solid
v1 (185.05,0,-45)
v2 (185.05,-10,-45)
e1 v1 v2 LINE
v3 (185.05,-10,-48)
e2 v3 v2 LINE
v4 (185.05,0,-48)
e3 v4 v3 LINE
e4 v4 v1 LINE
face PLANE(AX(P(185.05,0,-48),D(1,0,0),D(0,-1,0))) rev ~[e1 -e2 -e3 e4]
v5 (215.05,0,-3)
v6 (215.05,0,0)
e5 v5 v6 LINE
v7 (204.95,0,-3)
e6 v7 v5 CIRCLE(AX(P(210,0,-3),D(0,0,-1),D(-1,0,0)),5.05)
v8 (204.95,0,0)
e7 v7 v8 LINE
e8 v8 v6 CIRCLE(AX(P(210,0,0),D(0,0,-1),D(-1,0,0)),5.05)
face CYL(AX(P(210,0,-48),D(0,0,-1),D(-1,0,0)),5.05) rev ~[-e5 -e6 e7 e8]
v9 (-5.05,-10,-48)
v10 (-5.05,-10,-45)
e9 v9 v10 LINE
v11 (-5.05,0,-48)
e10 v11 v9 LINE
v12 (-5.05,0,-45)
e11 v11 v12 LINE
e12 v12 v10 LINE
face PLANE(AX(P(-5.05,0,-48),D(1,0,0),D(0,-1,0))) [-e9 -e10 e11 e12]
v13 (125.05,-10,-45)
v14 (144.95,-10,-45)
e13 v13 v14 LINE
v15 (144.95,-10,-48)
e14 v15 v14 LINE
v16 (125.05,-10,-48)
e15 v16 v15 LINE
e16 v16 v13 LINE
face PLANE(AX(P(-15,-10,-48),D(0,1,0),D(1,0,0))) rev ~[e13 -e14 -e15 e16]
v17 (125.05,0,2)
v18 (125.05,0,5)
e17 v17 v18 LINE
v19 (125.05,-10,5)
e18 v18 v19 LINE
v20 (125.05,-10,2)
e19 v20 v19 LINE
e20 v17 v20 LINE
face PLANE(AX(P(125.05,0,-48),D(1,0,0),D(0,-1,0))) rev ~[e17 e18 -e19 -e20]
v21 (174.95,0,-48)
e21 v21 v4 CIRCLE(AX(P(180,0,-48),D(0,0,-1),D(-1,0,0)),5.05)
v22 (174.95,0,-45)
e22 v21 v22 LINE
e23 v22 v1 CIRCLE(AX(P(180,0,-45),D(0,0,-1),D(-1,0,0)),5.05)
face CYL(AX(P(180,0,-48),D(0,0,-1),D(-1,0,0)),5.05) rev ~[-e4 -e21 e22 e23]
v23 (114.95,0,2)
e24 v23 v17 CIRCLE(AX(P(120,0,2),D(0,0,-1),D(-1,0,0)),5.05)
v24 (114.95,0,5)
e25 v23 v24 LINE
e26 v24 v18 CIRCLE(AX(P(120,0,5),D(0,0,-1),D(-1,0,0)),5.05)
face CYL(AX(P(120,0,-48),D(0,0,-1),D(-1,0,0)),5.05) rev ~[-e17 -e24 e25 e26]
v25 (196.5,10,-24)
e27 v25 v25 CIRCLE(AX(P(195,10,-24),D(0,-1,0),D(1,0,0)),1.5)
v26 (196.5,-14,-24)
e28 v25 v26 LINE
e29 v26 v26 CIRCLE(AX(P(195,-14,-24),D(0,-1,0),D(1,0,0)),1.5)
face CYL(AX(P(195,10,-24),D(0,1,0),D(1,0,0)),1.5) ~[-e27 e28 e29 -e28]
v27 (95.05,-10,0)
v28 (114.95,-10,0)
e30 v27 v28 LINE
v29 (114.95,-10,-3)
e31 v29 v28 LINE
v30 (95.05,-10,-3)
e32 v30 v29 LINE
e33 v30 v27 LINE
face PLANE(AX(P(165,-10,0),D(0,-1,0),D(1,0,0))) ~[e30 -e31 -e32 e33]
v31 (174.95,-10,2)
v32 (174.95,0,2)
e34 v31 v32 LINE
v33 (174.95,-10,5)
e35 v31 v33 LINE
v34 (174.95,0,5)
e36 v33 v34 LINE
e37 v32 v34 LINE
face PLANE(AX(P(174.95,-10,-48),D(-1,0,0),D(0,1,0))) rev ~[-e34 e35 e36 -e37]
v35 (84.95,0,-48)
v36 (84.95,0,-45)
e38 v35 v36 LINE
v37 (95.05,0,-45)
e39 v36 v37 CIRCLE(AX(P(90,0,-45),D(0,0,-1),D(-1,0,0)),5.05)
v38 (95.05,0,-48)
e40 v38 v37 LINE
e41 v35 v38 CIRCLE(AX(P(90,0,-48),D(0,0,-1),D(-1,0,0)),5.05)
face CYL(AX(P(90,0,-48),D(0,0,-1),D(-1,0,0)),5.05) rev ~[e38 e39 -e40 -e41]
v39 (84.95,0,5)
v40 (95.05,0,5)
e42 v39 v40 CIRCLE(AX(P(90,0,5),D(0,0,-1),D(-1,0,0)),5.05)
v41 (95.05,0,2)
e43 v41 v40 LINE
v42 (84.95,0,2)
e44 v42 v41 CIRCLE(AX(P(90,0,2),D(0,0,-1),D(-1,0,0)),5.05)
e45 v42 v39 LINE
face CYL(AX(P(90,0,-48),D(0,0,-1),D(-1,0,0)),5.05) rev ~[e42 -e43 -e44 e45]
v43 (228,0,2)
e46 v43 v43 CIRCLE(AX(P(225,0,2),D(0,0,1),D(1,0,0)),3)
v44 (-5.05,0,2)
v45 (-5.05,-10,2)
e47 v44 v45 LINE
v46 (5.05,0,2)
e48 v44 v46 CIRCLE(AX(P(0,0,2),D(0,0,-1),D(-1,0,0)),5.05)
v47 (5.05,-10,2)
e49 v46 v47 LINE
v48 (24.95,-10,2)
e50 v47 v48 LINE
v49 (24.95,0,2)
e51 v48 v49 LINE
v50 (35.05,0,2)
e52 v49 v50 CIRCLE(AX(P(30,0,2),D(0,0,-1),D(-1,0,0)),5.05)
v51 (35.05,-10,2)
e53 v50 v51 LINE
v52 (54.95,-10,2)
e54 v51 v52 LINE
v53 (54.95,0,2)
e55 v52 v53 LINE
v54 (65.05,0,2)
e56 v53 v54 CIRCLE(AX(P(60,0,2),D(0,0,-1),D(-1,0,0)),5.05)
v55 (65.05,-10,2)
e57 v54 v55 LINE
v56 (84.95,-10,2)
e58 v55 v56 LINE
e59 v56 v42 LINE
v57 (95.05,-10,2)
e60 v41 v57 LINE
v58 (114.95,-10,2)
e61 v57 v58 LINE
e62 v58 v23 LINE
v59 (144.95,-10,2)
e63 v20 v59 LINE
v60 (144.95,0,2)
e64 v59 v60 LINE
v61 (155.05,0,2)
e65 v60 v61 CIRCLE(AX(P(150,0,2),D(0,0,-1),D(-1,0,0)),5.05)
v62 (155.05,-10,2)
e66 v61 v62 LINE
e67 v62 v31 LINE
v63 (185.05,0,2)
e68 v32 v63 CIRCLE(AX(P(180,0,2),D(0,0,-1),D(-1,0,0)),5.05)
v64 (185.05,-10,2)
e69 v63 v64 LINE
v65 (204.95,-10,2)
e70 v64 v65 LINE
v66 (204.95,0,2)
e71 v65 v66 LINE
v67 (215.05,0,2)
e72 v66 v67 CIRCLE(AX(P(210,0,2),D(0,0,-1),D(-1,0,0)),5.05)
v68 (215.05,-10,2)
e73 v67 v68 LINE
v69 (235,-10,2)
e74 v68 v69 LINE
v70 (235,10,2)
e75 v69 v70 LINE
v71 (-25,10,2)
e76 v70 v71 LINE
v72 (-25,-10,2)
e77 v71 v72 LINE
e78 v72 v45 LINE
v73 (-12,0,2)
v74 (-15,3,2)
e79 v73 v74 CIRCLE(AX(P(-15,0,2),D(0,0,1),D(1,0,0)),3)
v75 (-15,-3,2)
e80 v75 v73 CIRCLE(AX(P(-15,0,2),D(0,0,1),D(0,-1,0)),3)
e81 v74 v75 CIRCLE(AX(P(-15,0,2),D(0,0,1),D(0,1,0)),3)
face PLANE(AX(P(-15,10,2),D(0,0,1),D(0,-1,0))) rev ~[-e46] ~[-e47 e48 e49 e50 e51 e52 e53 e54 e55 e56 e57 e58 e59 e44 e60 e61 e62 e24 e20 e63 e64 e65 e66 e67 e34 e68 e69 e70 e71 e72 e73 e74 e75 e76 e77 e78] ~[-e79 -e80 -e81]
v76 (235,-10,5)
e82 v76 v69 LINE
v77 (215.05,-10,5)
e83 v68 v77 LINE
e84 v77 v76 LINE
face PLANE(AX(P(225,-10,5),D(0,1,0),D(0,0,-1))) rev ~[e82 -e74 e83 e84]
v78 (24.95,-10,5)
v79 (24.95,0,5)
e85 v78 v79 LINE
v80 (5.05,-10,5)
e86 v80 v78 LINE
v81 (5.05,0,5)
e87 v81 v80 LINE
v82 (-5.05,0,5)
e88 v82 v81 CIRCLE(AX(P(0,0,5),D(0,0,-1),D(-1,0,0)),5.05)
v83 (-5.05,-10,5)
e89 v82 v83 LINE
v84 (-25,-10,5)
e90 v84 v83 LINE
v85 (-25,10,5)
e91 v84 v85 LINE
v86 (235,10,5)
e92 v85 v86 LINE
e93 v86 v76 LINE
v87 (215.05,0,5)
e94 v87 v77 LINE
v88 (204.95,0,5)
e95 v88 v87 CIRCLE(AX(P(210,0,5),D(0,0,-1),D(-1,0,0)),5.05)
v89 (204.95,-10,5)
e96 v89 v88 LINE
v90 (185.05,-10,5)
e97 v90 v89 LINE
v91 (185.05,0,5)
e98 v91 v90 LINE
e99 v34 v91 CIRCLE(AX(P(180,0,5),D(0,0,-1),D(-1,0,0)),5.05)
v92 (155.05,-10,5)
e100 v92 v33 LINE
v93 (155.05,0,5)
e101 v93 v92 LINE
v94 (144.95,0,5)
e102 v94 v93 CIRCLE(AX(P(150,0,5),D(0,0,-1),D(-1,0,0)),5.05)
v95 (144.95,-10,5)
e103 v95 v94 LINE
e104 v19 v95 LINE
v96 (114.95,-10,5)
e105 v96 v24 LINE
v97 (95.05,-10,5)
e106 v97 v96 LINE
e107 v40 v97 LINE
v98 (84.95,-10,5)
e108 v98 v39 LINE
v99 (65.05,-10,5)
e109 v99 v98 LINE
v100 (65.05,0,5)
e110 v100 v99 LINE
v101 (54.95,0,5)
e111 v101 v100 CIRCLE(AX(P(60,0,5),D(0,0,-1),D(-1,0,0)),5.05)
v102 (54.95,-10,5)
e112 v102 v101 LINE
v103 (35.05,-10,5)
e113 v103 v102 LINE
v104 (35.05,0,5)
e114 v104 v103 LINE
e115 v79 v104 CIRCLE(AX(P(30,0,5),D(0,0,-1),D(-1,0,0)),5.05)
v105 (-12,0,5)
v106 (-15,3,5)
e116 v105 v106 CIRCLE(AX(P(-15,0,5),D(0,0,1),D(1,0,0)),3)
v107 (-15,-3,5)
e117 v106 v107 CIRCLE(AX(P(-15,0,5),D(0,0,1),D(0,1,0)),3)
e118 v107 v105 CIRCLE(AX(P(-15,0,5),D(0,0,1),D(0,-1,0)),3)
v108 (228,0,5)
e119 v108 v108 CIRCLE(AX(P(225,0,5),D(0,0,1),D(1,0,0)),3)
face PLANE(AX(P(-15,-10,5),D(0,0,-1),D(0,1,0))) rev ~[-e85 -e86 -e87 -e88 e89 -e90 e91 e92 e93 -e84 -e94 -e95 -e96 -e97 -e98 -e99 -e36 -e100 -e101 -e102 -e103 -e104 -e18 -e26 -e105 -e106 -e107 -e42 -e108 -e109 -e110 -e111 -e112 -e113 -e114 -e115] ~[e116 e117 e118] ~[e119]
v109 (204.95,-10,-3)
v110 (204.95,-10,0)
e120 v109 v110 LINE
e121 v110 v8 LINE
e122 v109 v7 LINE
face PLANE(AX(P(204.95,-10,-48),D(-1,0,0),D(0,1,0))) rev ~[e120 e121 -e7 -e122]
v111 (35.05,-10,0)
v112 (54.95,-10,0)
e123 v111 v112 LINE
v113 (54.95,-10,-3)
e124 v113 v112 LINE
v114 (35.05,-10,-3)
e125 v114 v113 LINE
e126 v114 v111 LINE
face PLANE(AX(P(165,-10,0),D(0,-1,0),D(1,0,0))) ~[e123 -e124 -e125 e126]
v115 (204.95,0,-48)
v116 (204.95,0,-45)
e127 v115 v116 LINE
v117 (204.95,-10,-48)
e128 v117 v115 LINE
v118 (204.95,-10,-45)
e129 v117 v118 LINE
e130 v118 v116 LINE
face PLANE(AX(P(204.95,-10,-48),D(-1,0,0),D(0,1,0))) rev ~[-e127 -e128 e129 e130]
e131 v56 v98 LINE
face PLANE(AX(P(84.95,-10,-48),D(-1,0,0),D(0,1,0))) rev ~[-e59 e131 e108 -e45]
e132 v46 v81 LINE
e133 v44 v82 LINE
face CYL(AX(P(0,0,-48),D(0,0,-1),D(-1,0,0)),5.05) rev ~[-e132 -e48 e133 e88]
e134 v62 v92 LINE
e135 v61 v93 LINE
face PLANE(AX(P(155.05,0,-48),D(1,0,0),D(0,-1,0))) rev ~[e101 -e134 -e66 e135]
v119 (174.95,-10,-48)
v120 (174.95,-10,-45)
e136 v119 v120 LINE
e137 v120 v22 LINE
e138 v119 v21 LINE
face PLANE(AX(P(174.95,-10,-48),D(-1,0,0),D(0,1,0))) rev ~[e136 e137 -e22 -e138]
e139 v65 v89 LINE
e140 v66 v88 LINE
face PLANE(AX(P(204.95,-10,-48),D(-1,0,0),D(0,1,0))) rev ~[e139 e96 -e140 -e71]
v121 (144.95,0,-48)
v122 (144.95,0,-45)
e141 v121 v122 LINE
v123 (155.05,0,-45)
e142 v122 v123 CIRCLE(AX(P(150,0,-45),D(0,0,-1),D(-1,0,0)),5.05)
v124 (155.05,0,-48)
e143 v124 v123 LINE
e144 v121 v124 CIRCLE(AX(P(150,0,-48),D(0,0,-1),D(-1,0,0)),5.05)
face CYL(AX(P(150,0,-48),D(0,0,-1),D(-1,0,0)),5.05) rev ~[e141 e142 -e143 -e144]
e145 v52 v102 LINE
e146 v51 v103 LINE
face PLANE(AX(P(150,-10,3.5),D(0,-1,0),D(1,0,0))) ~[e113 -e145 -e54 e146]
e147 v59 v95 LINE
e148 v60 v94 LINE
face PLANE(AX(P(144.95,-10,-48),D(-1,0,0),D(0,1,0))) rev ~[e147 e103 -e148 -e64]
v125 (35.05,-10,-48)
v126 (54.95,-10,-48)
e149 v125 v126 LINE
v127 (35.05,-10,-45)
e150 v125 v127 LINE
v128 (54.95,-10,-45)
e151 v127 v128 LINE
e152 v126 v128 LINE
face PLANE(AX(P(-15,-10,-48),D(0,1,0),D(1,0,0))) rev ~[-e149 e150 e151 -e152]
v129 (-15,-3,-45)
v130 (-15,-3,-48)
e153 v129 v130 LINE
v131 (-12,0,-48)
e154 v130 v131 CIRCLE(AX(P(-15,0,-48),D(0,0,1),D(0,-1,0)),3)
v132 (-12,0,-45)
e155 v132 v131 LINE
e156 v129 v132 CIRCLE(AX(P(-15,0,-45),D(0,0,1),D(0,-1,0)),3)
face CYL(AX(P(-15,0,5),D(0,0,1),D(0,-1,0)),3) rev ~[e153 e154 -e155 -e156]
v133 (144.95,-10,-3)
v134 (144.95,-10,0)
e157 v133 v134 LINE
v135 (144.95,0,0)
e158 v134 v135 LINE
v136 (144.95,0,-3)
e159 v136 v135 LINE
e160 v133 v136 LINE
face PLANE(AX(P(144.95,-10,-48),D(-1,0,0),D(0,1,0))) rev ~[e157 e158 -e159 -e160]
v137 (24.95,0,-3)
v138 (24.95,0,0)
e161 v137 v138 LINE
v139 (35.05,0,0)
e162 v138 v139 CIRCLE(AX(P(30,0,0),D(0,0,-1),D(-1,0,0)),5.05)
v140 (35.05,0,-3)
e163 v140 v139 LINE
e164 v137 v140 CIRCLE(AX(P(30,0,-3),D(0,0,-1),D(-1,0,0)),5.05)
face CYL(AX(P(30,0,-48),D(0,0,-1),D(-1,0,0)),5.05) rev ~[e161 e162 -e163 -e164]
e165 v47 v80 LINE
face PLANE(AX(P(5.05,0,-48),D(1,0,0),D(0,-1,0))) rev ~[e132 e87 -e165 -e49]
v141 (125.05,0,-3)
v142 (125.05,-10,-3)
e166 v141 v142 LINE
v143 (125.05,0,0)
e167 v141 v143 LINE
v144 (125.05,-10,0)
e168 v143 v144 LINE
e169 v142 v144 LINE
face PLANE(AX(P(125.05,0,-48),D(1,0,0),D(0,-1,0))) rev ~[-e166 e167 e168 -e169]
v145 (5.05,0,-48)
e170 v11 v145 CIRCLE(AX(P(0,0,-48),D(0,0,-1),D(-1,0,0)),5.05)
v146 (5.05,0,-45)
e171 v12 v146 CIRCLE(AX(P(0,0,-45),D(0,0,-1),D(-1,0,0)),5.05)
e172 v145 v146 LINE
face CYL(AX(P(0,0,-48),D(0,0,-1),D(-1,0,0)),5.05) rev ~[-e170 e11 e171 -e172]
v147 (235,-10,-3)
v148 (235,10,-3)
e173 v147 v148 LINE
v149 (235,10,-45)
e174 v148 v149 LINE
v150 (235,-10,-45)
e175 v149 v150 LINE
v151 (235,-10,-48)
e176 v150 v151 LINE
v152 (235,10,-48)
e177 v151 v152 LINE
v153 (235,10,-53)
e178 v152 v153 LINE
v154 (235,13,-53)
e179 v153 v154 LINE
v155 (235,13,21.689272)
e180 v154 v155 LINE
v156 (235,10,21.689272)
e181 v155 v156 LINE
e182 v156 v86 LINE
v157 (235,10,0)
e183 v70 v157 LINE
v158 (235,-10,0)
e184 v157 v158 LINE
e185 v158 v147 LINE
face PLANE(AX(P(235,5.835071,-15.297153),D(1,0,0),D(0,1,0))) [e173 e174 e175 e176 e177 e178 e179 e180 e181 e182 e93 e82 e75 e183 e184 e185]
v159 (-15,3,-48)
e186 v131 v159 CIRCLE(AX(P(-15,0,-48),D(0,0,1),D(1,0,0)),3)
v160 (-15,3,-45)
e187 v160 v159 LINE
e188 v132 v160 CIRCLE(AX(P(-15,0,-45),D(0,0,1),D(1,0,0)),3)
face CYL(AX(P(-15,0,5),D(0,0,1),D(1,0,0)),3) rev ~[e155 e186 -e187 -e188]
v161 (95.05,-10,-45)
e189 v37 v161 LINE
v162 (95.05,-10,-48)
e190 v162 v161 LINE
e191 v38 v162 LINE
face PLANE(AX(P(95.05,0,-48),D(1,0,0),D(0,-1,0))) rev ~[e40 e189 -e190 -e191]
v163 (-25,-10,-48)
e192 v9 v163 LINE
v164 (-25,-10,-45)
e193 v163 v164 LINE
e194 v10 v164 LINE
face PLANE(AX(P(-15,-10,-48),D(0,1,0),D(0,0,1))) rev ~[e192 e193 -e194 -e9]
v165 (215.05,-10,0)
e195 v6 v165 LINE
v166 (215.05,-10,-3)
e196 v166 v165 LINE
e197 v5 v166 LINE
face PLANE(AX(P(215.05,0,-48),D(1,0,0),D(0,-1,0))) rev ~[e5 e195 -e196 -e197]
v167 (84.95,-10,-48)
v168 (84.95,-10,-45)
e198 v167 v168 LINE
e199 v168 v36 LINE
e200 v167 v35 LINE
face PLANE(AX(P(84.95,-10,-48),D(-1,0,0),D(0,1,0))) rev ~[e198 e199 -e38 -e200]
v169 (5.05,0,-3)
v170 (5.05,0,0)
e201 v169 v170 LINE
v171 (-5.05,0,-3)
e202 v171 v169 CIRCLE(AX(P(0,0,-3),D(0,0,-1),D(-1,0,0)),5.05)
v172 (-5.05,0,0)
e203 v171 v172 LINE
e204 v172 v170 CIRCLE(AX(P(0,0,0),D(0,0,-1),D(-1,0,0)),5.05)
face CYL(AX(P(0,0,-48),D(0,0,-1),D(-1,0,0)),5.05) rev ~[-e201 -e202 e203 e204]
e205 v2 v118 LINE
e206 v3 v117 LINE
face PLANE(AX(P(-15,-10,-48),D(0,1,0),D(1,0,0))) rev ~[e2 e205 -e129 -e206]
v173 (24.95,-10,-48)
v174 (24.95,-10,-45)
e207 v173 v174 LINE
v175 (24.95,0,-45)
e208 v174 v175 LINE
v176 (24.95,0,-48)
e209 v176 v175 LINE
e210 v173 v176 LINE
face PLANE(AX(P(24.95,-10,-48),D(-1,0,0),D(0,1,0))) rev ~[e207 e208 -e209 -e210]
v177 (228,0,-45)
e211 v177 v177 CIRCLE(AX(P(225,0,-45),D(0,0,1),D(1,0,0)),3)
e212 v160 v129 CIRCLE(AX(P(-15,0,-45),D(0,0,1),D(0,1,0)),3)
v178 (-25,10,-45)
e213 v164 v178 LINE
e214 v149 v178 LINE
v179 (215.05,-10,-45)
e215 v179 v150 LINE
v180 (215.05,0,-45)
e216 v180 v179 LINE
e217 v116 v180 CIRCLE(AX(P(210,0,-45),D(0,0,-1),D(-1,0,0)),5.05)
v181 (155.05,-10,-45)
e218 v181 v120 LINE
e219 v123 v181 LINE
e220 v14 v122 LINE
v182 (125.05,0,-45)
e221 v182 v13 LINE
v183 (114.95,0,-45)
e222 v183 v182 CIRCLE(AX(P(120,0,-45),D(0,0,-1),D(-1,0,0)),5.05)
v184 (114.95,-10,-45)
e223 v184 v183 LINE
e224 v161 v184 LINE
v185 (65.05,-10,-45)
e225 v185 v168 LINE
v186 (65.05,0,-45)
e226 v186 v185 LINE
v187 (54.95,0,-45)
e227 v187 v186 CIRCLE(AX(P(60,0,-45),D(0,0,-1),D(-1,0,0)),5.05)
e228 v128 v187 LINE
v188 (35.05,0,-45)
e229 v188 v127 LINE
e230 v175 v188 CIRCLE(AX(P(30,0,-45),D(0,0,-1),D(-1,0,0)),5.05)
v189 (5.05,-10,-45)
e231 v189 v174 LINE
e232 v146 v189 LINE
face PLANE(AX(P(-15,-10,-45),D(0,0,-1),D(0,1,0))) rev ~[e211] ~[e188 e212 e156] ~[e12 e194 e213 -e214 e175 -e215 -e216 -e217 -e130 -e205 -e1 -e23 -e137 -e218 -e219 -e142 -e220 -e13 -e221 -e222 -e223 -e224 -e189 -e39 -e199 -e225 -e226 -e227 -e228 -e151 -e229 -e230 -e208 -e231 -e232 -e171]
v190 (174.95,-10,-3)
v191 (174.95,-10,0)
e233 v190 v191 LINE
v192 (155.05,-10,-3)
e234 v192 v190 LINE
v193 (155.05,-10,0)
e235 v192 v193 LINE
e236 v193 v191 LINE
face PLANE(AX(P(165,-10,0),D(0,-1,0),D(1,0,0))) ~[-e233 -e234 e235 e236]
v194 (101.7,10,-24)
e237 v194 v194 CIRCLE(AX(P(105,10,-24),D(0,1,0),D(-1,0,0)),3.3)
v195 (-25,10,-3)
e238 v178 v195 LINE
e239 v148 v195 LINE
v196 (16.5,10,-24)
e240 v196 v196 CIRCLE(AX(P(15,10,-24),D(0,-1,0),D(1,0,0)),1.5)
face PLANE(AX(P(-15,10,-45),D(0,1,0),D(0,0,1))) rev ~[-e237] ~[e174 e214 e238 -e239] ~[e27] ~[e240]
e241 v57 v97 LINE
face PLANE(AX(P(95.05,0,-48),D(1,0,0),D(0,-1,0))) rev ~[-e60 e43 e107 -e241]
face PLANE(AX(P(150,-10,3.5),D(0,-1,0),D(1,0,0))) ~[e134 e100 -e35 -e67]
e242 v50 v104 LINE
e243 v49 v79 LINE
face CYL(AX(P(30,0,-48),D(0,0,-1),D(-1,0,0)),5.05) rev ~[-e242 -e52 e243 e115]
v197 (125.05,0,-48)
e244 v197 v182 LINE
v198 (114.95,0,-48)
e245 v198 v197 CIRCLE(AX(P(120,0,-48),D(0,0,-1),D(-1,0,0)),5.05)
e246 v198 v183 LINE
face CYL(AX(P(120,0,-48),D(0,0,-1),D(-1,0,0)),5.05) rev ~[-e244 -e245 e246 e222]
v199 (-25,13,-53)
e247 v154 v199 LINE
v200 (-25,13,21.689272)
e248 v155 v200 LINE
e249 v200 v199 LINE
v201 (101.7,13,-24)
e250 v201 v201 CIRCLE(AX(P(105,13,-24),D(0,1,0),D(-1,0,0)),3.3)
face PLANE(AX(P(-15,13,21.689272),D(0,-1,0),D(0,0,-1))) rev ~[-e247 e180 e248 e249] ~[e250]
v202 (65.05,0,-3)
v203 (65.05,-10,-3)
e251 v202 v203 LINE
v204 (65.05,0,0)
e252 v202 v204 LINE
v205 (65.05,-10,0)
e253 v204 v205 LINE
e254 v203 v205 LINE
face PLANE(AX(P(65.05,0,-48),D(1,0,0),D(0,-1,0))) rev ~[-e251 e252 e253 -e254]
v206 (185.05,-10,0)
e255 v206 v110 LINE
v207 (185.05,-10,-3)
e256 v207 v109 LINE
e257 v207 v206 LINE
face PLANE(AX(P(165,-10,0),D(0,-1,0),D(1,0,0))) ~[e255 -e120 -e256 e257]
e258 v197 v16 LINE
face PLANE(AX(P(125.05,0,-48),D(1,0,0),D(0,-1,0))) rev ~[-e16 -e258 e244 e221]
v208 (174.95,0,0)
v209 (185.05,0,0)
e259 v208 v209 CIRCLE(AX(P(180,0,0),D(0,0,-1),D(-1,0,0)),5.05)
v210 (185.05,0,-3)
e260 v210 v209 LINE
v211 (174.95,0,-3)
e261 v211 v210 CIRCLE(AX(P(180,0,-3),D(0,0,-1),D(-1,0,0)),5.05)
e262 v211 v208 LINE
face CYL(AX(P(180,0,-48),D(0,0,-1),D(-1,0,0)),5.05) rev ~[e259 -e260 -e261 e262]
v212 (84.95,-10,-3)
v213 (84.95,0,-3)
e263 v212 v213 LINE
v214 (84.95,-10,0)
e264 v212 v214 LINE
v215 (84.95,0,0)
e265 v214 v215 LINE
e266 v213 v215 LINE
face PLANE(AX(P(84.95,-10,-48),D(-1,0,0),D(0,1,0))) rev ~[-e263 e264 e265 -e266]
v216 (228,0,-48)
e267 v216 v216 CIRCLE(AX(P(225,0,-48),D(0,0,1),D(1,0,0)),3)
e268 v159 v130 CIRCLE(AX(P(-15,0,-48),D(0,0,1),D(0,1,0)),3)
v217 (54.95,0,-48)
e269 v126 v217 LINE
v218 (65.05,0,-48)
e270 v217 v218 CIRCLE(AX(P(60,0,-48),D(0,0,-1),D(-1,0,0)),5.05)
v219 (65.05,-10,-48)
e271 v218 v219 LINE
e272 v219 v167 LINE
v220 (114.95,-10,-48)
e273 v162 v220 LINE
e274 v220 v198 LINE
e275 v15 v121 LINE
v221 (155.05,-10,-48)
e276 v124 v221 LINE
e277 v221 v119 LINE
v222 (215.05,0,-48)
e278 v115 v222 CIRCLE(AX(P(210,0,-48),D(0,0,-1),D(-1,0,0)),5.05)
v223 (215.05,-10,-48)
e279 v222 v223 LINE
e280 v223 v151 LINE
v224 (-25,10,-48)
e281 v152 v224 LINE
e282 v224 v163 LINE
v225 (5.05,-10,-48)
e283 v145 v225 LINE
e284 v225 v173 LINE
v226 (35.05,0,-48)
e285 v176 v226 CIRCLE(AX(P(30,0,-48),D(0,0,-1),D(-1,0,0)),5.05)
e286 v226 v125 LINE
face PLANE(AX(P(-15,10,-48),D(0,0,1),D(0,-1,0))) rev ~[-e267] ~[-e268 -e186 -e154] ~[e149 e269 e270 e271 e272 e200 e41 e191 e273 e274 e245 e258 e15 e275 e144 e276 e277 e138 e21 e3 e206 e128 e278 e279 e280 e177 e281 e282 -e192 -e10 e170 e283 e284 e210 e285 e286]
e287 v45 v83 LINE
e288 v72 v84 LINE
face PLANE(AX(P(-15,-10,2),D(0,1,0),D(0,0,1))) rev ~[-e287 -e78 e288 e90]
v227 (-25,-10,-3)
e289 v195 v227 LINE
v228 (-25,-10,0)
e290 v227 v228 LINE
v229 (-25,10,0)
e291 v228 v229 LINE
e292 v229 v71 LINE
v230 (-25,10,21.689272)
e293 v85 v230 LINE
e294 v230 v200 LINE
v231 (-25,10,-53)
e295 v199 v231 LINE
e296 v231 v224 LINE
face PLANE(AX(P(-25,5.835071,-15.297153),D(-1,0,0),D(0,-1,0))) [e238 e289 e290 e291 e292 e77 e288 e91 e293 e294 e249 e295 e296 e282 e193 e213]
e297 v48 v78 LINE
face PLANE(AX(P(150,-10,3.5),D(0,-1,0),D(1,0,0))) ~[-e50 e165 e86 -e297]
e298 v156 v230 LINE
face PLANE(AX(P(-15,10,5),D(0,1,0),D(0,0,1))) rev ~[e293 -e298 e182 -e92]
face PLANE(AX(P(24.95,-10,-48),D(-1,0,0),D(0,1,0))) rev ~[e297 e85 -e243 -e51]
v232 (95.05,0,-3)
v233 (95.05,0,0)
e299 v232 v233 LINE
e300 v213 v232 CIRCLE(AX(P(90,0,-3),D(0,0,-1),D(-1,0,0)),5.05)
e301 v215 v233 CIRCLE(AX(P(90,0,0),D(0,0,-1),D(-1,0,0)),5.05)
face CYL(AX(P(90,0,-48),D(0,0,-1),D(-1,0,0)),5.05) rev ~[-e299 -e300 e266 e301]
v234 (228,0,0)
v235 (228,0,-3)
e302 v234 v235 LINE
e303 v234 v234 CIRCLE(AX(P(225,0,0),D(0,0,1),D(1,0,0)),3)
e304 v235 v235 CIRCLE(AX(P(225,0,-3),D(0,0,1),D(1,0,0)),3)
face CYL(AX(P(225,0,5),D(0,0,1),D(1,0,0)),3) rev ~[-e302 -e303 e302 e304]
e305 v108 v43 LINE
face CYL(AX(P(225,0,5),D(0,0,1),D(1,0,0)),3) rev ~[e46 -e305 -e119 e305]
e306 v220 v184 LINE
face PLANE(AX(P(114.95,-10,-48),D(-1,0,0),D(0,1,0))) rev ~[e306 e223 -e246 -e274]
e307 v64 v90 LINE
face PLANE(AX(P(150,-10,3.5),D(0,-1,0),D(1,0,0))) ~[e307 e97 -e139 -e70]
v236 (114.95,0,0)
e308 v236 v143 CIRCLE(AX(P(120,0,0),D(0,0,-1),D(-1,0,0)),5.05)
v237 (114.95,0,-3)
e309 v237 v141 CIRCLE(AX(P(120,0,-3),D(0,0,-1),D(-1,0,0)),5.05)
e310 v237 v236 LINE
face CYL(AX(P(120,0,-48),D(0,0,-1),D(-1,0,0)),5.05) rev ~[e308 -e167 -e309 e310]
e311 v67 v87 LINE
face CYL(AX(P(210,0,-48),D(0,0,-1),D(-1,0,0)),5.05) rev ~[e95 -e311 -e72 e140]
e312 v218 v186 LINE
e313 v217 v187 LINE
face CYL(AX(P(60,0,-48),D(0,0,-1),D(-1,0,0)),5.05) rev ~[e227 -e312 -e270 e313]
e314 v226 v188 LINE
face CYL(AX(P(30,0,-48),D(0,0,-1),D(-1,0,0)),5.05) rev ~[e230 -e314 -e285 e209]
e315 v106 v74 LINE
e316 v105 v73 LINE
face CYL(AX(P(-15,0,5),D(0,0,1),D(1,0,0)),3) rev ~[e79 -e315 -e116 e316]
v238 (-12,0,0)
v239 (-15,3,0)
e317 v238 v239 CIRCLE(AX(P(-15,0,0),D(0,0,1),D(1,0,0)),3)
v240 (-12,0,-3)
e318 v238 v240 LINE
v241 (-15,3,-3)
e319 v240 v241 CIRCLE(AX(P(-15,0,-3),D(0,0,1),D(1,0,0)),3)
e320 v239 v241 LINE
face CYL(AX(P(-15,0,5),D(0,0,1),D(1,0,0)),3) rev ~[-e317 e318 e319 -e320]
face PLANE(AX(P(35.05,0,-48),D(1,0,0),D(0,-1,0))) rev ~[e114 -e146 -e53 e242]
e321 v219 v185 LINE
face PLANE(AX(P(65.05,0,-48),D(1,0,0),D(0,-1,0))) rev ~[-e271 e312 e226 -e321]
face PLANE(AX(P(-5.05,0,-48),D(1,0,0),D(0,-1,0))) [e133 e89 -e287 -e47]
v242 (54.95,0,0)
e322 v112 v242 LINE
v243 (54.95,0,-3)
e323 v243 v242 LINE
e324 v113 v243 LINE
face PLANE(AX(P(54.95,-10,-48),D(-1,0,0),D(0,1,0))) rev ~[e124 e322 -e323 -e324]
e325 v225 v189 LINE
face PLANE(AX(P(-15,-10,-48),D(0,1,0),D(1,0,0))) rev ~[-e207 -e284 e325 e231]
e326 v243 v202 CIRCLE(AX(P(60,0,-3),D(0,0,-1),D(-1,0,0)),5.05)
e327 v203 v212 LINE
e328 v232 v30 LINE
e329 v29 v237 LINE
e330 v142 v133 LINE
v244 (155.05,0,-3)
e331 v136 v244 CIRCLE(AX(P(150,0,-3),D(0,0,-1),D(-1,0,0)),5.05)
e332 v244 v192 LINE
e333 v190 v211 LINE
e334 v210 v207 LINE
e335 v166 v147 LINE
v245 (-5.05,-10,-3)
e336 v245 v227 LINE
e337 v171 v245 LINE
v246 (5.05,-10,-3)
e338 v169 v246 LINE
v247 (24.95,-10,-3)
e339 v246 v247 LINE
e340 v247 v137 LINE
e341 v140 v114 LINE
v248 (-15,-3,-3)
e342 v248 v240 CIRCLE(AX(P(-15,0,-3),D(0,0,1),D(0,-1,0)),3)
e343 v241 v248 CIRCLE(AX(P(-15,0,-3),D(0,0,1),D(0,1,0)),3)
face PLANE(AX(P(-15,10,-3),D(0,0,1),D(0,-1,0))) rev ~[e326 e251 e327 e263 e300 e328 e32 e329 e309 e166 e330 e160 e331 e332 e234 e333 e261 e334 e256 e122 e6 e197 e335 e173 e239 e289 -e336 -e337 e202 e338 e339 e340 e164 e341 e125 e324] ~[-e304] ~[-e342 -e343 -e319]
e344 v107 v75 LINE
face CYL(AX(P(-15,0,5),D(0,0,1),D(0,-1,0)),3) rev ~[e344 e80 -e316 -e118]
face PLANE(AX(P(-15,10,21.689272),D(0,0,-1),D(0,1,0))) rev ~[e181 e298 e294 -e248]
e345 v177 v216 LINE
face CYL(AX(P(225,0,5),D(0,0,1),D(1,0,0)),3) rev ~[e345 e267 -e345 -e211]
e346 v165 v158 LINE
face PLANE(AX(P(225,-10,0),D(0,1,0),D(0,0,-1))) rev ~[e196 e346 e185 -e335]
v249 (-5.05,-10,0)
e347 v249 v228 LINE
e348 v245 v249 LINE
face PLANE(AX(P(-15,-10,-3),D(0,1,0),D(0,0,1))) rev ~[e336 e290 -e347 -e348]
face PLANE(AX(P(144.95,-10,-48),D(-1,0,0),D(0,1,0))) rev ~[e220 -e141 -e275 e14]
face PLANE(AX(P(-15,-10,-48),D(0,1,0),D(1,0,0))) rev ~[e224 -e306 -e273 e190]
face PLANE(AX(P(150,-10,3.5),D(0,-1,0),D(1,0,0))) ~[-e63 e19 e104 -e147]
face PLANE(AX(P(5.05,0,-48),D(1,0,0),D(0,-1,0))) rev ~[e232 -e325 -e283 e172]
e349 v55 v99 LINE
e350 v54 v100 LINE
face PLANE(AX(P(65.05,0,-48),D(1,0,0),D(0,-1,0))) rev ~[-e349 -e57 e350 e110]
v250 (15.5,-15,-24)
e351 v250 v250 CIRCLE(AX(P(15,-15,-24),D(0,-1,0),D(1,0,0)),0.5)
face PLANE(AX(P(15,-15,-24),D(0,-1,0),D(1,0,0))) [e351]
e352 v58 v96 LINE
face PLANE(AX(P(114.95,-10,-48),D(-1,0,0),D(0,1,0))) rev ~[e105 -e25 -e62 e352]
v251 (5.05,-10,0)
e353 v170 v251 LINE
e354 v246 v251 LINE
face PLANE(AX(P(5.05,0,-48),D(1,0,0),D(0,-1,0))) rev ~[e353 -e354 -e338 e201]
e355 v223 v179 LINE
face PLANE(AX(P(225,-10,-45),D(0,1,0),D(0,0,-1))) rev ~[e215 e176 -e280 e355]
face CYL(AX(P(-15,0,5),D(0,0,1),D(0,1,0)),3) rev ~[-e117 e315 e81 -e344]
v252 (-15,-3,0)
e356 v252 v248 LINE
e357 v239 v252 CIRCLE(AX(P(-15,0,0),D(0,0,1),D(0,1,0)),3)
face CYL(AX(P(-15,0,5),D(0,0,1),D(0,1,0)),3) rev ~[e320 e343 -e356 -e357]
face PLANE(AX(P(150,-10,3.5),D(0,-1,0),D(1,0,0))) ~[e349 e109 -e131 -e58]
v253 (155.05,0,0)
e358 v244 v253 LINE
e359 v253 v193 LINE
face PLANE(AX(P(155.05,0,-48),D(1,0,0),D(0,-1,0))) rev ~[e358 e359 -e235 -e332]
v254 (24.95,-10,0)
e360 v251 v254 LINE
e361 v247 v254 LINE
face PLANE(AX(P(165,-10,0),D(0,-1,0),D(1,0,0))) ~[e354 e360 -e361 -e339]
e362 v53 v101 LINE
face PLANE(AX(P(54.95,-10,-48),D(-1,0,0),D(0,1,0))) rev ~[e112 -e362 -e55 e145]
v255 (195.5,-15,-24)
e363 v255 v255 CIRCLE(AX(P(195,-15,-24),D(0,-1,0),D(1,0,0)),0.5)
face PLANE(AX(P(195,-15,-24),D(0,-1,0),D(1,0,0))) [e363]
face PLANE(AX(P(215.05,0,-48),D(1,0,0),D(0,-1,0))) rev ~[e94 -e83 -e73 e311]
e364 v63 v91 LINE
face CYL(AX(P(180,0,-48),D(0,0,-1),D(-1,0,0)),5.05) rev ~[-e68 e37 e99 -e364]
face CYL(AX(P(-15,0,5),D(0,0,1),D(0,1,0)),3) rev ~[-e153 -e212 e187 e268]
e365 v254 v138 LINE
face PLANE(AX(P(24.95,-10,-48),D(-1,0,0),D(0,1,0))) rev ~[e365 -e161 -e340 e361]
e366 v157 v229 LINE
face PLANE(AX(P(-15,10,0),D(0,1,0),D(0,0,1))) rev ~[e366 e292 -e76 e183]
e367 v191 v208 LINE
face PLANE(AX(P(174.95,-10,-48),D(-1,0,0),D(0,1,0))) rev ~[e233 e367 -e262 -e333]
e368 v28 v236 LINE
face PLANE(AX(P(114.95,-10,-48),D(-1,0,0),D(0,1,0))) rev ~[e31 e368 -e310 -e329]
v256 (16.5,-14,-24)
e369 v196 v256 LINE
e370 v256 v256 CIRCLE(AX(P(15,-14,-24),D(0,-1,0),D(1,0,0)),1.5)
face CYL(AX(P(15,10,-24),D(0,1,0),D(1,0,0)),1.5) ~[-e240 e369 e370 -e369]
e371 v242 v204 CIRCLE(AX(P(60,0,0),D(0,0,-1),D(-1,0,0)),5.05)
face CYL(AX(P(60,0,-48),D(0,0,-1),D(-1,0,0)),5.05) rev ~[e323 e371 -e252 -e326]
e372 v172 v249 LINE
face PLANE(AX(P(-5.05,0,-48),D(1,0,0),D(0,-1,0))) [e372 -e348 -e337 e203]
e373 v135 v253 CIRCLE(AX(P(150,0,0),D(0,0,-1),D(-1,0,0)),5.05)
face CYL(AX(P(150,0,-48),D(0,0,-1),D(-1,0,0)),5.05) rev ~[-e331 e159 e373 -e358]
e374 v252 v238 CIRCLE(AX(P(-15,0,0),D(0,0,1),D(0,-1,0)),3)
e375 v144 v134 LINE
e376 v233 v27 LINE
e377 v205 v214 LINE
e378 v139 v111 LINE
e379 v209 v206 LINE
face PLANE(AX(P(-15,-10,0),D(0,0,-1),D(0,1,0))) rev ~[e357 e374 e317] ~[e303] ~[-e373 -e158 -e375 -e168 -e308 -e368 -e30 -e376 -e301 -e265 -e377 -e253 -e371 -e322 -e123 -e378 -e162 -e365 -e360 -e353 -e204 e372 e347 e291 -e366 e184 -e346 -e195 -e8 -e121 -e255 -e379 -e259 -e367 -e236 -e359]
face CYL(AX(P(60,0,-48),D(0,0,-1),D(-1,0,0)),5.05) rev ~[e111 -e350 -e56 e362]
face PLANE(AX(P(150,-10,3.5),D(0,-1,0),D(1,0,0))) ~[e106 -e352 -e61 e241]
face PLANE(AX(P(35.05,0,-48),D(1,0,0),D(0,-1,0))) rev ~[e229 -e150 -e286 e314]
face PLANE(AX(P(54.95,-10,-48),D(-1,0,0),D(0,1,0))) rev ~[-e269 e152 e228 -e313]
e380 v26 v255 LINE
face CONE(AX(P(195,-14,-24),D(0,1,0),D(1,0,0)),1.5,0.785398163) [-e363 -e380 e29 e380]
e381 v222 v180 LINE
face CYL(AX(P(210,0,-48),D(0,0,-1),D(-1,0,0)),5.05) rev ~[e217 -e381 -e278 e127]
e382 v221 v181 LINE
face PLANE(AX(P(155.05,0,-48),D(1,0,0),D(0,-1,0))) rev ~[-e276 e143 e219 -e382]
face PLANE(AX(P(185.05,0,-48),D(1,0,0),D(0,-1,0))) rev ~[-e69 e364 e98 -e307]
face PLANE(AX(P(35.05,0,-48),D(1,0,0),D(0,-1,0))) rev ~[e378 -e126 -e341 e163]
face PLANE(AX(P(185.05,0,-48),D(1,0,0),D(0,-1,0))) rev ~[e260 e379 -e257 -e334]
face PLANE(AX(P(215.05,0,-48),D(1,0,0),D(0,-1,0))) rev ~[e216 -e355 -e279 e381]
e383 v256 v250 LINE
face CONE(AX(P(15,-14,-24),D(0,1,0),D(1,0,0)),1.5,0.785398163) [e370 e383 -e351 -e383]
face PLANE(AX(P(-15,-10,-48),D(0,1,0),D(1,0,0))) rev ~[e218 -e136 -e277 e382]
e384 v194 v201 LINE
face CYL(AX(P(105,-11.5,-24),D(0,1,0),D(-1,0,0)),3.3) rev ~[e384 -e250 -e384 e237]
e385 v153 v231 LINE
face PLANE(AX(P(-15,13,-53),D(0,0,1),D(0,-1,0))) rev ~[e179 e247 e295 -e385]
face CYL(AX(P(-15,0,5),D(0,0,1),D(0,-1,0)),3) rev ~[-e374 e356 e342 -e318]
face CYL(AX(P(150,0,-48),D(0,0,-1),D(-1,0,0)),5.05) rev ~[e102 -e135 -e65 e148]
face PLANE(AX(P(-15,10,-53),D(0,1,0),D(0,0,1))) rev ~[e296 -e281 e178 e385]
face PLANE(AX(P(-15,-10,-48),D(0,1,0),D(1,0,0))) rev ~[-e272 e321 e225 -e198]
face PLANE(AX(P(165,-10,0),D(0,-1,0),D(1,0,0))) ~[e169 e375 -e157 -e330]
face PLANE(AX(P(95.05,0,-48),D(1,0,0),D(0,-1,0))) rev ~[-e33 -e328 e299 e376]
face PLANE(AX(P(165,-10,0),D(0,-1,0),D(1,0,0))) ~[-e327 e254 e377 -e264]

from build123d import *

# Parameters (mm, degrees)
F0_W      = 30
F0_H      = 20
F1_DEPTH  = 3
F2_W      = 30
F2_H      = 21.6892715544
F2_H_2    = 3
F2_H_3    = 50
F3_DEPTH  = 3
F4_W      = 30
F4_H      = 3
F5_DEPTH  = 20
F10_W     = 240
F10_H     = 23
F11_DEPTH = 3
F12_W     = 10.1
F12_H     = 10
F13_DEPTH = 72
F15_D     = 6.6
F15_DEPTH = 21.5
F15_TIP   = 1.9828400428
F16_R     = 1.5
F17_DEPTH = 25
F18_SIZE  = 1
F20_DEPTH = 10
F22_DEPTH = 10
F23_R     = 3
F24_DEPTH = 60


# Not quite as in the source:
# - a feature names something its author has since deleted; it is built from what else it names


with BuildPart() as f1:
    # F0 (on Top) → F1 (new body)
    with BuildSketch(Plane.XY):
        Rectangle(F0_W, F0_H)
    extrude(amount=-F1_DEPTH)

    # F2 (on face) → F3 (join)
    with BuildSketch(Plane(origin=(0, 10, 0), x_dir=(-1, 0, 0), z_dir=(0, 1, 0))):
        with Locations((0, 10.8446357772)):
            Rectangle(F2_W, F2_H)
        with Locations((0, -1.5)):
            Rectangle(F2_W, F2_H_2)
        with Locations((0, -28)):
            Rectangle(F2_W, F2_H_3)
    extrude(amount=F3_DEPTH)

    # F4 (on face) → F5 (join)
    with BuildSketch(Plane.XZ.offset(-10)):
        with Locations((0, 3.5)):
            Rectangle(F4_W, F4_H)
    extrude(amount=F5_DEPTH)

    # F6: F1 across face


with BuildPart() as f1_1:
    add(f1.part)
    add(f1.part.mirror(Plane(origin=(15, 7.489162772, -9.8464985819), x_dir=(0, 1, 0), z_dir=(1, 0, 0))))

    # F7: F1 across face


with BuildPart() as f1_2:
    add(f1_1.part)
    add(f1_1.part.mirror(Plane(origin=(45, 7.489162772, -9.8464985819), x_dir=(0, 1, 0), z_dir=(1, 0, 0))))

    # F8: F1 across face


with BuildPart() as f1_3:
    add(f1_2.part)
    add(f1_2.part.mirror(Plane(origin=(105, 7.489162772, -9.8464985819), x_dir=(0, 1, 0), z_dir=(1, 0, 0))))

    # F10 (on offset) → F11 (join)
    with BuildSketch(Plane(origin=(0, 0, -48), x_dir=(1, 0, 0), z_dir=(0, 0, -1))):
        with Locations((105, -1.5)):
            Rectangle(F10_W, F10_H)
    extrude(amount=-F11_DEPTH)

    # F12 (on face) → F13 (cut)
    with BuildSketch(Plane(origin=(0, 0, -48), x_dir=(1, 0, 0), z_dir=(0, 0, -1))):
        with Locations((0, 5)):
            Rectangle(F12_W, F12_H)
        with BuildLine():
            Line((5.05, 0), (-5.05, 0))
            ThreePointArc((-5.05, 0), (0, -5.05), (5.05, 0))
        make_face()
        with BuildLine():
            Line((35.05, 10), (24.95, 10))
            Line((24.95, 10), (24.95, 0))
            ThreePointArc((24.95, 0), (30, -5.05), (35.05, 0))
            Line((35.05, 0), (35.05, 10))
        make_face()
        with BuildLine():
            Line((65.05, 10), (54.95, 10))
            Line((54.95, 10), (54.95, 0))
            ThreePointArc((54.95, 0), (60, -5.05), (65.05, 0))
            Line((65.05, 0), (65.05, 10))
        make_face()
        with BuildLine():
            Line((95.05, 10), (84.95, 10))
            Line((84.95, 10), (84.95, 0))
            ThreePointArc((84.95, 0), (90, -5.05), (95.05, 0))
            Line((95.05, 0), (95.05, 10))
        make_face()
        with BuildLine():
            Line((125.05, 10), (114.95, 10))
            Line((114.95, 10), (114.95, 0))
            ThreePointArc((114.95, 0), (120, -5.05), (125.05, 0))
            Line((125.05, 0), (125.05, 10))
        make_face()
        with BuildLine():
            Line((155.05, 0), (155.05, 10))
            Line((155.05, 10), (144.95, 10))
            Line((144.95, 10), (144.95, 0))
            ThreePointArc((144.95, 0), (150, -5.05), (155.05, 0))
        make_face()
        with BuildLine():
            Line((185.05, 0), (185.05, 10))
            Line((185.05, 10), (174.95, 10))
            Line((174.95, 10), (174.95, 0))
            ThreePointArc((174.95, 0), (180, -5.05), (185.05, 0))
        make_face()
        with BuildLine():
            Line((215.05, 0), (215.05, 10))
            Line((215.05, 10), (204.95, 10))
            Line((204.95, 10), (204.95, 0))
            ThreePointArc((204.95, 0), (210, -5.05), (215.05, 0))
        make_face()
    extrude(amount=-F13_DEPTH, mode=Mode.SUBTRACT)

    # F15
    with Locations(Plane.XZ.offset(-10)):
        with Locations((105, -24)):
            Hole(F15_D / 2, depth=F15_DEPTH)
            with Locations((0, 0, -(F15_DEPTH + F15_TIP / 2))):  # 118° drill point
                Cone(0, F15_D / 2, F15_TIP, mode=Mode.SUBTRACT)

    # F16 (on face) → F17 (join)
    with BuildSketch(Plane.XZ.offset(-10)):
        with Locations((15, -24)):
            Circle(F16_R)
        with Locations((195, -24)):
            Circle(F16_R)
    extrude(amount=F17_DEPTH)

    # F18
    f18_edges = [f1_3.edges().sort_by_distance(p)[0] for p in [
        (13.5, -15, -24),
        (193.5, -15, -24),
    ]]
    chamfer(f18_edges, length=F18_SIZE)

    # F19 (on face) → F20 (join)
    with BuildSketch(Plane.YZ.offset(225)):
        Polygon((13, 21.6892715544), (10, 21.6892715544), (10, 5), (-10, 5), (-10, 2), (10, 2), (10, 0), (-10, 0), (-10, -3), (10, -3), (10, -45), (-10, -45), (-10, -48), (10, -48), (10, -53), (13, -53), align=None)
    extrude(amount=F20_DEPTH)

    # F21 (on face) → F22 (join)
    with BuildSketch(Plane(origin=(-15, 0, 0), x_dir=(0, -1, 0), z_dir=(-1, 0, 0))):
        Polygon((-10, 5), (-10, 21.6892715544), (-13, 21.6892715544), (-13, -53), (-10, -53), (-10, -48), (10, -48), (10, -45), (-10, -45), (-10, -3), (10, -3), (10, 0), (-10, 0), (-10, 2), (10, 2), (10, 5), align=None)
    extrude(amount=F22_DEPTH)

    # F23 (on face) → F24 (cut)
    with BuildSketch(Plane.XY.offset(5)):
        with BuildLine():
            ThreePointArc((-15, -3), (-12.8786796564, -2.1213203436), (-12, 0))
            ThreePointArc((-12, 0), (-12.8786796564, 2.1213203436), (-15, 3))
            Line((-15, 3), (-15, -3))
        make_face()
        with BuildLine():
            Line((-15, -3), (-15, 3))
            ThreePointArc((-15, 3), (-18, 0), (-15, -3))
        make_face()
        with Locations((225, 0)):
            Circle(F23_R)
    extrude(amount=-F24_DEPTH, mode=Mode.SUBTRACT)


solid = f1_3.part
